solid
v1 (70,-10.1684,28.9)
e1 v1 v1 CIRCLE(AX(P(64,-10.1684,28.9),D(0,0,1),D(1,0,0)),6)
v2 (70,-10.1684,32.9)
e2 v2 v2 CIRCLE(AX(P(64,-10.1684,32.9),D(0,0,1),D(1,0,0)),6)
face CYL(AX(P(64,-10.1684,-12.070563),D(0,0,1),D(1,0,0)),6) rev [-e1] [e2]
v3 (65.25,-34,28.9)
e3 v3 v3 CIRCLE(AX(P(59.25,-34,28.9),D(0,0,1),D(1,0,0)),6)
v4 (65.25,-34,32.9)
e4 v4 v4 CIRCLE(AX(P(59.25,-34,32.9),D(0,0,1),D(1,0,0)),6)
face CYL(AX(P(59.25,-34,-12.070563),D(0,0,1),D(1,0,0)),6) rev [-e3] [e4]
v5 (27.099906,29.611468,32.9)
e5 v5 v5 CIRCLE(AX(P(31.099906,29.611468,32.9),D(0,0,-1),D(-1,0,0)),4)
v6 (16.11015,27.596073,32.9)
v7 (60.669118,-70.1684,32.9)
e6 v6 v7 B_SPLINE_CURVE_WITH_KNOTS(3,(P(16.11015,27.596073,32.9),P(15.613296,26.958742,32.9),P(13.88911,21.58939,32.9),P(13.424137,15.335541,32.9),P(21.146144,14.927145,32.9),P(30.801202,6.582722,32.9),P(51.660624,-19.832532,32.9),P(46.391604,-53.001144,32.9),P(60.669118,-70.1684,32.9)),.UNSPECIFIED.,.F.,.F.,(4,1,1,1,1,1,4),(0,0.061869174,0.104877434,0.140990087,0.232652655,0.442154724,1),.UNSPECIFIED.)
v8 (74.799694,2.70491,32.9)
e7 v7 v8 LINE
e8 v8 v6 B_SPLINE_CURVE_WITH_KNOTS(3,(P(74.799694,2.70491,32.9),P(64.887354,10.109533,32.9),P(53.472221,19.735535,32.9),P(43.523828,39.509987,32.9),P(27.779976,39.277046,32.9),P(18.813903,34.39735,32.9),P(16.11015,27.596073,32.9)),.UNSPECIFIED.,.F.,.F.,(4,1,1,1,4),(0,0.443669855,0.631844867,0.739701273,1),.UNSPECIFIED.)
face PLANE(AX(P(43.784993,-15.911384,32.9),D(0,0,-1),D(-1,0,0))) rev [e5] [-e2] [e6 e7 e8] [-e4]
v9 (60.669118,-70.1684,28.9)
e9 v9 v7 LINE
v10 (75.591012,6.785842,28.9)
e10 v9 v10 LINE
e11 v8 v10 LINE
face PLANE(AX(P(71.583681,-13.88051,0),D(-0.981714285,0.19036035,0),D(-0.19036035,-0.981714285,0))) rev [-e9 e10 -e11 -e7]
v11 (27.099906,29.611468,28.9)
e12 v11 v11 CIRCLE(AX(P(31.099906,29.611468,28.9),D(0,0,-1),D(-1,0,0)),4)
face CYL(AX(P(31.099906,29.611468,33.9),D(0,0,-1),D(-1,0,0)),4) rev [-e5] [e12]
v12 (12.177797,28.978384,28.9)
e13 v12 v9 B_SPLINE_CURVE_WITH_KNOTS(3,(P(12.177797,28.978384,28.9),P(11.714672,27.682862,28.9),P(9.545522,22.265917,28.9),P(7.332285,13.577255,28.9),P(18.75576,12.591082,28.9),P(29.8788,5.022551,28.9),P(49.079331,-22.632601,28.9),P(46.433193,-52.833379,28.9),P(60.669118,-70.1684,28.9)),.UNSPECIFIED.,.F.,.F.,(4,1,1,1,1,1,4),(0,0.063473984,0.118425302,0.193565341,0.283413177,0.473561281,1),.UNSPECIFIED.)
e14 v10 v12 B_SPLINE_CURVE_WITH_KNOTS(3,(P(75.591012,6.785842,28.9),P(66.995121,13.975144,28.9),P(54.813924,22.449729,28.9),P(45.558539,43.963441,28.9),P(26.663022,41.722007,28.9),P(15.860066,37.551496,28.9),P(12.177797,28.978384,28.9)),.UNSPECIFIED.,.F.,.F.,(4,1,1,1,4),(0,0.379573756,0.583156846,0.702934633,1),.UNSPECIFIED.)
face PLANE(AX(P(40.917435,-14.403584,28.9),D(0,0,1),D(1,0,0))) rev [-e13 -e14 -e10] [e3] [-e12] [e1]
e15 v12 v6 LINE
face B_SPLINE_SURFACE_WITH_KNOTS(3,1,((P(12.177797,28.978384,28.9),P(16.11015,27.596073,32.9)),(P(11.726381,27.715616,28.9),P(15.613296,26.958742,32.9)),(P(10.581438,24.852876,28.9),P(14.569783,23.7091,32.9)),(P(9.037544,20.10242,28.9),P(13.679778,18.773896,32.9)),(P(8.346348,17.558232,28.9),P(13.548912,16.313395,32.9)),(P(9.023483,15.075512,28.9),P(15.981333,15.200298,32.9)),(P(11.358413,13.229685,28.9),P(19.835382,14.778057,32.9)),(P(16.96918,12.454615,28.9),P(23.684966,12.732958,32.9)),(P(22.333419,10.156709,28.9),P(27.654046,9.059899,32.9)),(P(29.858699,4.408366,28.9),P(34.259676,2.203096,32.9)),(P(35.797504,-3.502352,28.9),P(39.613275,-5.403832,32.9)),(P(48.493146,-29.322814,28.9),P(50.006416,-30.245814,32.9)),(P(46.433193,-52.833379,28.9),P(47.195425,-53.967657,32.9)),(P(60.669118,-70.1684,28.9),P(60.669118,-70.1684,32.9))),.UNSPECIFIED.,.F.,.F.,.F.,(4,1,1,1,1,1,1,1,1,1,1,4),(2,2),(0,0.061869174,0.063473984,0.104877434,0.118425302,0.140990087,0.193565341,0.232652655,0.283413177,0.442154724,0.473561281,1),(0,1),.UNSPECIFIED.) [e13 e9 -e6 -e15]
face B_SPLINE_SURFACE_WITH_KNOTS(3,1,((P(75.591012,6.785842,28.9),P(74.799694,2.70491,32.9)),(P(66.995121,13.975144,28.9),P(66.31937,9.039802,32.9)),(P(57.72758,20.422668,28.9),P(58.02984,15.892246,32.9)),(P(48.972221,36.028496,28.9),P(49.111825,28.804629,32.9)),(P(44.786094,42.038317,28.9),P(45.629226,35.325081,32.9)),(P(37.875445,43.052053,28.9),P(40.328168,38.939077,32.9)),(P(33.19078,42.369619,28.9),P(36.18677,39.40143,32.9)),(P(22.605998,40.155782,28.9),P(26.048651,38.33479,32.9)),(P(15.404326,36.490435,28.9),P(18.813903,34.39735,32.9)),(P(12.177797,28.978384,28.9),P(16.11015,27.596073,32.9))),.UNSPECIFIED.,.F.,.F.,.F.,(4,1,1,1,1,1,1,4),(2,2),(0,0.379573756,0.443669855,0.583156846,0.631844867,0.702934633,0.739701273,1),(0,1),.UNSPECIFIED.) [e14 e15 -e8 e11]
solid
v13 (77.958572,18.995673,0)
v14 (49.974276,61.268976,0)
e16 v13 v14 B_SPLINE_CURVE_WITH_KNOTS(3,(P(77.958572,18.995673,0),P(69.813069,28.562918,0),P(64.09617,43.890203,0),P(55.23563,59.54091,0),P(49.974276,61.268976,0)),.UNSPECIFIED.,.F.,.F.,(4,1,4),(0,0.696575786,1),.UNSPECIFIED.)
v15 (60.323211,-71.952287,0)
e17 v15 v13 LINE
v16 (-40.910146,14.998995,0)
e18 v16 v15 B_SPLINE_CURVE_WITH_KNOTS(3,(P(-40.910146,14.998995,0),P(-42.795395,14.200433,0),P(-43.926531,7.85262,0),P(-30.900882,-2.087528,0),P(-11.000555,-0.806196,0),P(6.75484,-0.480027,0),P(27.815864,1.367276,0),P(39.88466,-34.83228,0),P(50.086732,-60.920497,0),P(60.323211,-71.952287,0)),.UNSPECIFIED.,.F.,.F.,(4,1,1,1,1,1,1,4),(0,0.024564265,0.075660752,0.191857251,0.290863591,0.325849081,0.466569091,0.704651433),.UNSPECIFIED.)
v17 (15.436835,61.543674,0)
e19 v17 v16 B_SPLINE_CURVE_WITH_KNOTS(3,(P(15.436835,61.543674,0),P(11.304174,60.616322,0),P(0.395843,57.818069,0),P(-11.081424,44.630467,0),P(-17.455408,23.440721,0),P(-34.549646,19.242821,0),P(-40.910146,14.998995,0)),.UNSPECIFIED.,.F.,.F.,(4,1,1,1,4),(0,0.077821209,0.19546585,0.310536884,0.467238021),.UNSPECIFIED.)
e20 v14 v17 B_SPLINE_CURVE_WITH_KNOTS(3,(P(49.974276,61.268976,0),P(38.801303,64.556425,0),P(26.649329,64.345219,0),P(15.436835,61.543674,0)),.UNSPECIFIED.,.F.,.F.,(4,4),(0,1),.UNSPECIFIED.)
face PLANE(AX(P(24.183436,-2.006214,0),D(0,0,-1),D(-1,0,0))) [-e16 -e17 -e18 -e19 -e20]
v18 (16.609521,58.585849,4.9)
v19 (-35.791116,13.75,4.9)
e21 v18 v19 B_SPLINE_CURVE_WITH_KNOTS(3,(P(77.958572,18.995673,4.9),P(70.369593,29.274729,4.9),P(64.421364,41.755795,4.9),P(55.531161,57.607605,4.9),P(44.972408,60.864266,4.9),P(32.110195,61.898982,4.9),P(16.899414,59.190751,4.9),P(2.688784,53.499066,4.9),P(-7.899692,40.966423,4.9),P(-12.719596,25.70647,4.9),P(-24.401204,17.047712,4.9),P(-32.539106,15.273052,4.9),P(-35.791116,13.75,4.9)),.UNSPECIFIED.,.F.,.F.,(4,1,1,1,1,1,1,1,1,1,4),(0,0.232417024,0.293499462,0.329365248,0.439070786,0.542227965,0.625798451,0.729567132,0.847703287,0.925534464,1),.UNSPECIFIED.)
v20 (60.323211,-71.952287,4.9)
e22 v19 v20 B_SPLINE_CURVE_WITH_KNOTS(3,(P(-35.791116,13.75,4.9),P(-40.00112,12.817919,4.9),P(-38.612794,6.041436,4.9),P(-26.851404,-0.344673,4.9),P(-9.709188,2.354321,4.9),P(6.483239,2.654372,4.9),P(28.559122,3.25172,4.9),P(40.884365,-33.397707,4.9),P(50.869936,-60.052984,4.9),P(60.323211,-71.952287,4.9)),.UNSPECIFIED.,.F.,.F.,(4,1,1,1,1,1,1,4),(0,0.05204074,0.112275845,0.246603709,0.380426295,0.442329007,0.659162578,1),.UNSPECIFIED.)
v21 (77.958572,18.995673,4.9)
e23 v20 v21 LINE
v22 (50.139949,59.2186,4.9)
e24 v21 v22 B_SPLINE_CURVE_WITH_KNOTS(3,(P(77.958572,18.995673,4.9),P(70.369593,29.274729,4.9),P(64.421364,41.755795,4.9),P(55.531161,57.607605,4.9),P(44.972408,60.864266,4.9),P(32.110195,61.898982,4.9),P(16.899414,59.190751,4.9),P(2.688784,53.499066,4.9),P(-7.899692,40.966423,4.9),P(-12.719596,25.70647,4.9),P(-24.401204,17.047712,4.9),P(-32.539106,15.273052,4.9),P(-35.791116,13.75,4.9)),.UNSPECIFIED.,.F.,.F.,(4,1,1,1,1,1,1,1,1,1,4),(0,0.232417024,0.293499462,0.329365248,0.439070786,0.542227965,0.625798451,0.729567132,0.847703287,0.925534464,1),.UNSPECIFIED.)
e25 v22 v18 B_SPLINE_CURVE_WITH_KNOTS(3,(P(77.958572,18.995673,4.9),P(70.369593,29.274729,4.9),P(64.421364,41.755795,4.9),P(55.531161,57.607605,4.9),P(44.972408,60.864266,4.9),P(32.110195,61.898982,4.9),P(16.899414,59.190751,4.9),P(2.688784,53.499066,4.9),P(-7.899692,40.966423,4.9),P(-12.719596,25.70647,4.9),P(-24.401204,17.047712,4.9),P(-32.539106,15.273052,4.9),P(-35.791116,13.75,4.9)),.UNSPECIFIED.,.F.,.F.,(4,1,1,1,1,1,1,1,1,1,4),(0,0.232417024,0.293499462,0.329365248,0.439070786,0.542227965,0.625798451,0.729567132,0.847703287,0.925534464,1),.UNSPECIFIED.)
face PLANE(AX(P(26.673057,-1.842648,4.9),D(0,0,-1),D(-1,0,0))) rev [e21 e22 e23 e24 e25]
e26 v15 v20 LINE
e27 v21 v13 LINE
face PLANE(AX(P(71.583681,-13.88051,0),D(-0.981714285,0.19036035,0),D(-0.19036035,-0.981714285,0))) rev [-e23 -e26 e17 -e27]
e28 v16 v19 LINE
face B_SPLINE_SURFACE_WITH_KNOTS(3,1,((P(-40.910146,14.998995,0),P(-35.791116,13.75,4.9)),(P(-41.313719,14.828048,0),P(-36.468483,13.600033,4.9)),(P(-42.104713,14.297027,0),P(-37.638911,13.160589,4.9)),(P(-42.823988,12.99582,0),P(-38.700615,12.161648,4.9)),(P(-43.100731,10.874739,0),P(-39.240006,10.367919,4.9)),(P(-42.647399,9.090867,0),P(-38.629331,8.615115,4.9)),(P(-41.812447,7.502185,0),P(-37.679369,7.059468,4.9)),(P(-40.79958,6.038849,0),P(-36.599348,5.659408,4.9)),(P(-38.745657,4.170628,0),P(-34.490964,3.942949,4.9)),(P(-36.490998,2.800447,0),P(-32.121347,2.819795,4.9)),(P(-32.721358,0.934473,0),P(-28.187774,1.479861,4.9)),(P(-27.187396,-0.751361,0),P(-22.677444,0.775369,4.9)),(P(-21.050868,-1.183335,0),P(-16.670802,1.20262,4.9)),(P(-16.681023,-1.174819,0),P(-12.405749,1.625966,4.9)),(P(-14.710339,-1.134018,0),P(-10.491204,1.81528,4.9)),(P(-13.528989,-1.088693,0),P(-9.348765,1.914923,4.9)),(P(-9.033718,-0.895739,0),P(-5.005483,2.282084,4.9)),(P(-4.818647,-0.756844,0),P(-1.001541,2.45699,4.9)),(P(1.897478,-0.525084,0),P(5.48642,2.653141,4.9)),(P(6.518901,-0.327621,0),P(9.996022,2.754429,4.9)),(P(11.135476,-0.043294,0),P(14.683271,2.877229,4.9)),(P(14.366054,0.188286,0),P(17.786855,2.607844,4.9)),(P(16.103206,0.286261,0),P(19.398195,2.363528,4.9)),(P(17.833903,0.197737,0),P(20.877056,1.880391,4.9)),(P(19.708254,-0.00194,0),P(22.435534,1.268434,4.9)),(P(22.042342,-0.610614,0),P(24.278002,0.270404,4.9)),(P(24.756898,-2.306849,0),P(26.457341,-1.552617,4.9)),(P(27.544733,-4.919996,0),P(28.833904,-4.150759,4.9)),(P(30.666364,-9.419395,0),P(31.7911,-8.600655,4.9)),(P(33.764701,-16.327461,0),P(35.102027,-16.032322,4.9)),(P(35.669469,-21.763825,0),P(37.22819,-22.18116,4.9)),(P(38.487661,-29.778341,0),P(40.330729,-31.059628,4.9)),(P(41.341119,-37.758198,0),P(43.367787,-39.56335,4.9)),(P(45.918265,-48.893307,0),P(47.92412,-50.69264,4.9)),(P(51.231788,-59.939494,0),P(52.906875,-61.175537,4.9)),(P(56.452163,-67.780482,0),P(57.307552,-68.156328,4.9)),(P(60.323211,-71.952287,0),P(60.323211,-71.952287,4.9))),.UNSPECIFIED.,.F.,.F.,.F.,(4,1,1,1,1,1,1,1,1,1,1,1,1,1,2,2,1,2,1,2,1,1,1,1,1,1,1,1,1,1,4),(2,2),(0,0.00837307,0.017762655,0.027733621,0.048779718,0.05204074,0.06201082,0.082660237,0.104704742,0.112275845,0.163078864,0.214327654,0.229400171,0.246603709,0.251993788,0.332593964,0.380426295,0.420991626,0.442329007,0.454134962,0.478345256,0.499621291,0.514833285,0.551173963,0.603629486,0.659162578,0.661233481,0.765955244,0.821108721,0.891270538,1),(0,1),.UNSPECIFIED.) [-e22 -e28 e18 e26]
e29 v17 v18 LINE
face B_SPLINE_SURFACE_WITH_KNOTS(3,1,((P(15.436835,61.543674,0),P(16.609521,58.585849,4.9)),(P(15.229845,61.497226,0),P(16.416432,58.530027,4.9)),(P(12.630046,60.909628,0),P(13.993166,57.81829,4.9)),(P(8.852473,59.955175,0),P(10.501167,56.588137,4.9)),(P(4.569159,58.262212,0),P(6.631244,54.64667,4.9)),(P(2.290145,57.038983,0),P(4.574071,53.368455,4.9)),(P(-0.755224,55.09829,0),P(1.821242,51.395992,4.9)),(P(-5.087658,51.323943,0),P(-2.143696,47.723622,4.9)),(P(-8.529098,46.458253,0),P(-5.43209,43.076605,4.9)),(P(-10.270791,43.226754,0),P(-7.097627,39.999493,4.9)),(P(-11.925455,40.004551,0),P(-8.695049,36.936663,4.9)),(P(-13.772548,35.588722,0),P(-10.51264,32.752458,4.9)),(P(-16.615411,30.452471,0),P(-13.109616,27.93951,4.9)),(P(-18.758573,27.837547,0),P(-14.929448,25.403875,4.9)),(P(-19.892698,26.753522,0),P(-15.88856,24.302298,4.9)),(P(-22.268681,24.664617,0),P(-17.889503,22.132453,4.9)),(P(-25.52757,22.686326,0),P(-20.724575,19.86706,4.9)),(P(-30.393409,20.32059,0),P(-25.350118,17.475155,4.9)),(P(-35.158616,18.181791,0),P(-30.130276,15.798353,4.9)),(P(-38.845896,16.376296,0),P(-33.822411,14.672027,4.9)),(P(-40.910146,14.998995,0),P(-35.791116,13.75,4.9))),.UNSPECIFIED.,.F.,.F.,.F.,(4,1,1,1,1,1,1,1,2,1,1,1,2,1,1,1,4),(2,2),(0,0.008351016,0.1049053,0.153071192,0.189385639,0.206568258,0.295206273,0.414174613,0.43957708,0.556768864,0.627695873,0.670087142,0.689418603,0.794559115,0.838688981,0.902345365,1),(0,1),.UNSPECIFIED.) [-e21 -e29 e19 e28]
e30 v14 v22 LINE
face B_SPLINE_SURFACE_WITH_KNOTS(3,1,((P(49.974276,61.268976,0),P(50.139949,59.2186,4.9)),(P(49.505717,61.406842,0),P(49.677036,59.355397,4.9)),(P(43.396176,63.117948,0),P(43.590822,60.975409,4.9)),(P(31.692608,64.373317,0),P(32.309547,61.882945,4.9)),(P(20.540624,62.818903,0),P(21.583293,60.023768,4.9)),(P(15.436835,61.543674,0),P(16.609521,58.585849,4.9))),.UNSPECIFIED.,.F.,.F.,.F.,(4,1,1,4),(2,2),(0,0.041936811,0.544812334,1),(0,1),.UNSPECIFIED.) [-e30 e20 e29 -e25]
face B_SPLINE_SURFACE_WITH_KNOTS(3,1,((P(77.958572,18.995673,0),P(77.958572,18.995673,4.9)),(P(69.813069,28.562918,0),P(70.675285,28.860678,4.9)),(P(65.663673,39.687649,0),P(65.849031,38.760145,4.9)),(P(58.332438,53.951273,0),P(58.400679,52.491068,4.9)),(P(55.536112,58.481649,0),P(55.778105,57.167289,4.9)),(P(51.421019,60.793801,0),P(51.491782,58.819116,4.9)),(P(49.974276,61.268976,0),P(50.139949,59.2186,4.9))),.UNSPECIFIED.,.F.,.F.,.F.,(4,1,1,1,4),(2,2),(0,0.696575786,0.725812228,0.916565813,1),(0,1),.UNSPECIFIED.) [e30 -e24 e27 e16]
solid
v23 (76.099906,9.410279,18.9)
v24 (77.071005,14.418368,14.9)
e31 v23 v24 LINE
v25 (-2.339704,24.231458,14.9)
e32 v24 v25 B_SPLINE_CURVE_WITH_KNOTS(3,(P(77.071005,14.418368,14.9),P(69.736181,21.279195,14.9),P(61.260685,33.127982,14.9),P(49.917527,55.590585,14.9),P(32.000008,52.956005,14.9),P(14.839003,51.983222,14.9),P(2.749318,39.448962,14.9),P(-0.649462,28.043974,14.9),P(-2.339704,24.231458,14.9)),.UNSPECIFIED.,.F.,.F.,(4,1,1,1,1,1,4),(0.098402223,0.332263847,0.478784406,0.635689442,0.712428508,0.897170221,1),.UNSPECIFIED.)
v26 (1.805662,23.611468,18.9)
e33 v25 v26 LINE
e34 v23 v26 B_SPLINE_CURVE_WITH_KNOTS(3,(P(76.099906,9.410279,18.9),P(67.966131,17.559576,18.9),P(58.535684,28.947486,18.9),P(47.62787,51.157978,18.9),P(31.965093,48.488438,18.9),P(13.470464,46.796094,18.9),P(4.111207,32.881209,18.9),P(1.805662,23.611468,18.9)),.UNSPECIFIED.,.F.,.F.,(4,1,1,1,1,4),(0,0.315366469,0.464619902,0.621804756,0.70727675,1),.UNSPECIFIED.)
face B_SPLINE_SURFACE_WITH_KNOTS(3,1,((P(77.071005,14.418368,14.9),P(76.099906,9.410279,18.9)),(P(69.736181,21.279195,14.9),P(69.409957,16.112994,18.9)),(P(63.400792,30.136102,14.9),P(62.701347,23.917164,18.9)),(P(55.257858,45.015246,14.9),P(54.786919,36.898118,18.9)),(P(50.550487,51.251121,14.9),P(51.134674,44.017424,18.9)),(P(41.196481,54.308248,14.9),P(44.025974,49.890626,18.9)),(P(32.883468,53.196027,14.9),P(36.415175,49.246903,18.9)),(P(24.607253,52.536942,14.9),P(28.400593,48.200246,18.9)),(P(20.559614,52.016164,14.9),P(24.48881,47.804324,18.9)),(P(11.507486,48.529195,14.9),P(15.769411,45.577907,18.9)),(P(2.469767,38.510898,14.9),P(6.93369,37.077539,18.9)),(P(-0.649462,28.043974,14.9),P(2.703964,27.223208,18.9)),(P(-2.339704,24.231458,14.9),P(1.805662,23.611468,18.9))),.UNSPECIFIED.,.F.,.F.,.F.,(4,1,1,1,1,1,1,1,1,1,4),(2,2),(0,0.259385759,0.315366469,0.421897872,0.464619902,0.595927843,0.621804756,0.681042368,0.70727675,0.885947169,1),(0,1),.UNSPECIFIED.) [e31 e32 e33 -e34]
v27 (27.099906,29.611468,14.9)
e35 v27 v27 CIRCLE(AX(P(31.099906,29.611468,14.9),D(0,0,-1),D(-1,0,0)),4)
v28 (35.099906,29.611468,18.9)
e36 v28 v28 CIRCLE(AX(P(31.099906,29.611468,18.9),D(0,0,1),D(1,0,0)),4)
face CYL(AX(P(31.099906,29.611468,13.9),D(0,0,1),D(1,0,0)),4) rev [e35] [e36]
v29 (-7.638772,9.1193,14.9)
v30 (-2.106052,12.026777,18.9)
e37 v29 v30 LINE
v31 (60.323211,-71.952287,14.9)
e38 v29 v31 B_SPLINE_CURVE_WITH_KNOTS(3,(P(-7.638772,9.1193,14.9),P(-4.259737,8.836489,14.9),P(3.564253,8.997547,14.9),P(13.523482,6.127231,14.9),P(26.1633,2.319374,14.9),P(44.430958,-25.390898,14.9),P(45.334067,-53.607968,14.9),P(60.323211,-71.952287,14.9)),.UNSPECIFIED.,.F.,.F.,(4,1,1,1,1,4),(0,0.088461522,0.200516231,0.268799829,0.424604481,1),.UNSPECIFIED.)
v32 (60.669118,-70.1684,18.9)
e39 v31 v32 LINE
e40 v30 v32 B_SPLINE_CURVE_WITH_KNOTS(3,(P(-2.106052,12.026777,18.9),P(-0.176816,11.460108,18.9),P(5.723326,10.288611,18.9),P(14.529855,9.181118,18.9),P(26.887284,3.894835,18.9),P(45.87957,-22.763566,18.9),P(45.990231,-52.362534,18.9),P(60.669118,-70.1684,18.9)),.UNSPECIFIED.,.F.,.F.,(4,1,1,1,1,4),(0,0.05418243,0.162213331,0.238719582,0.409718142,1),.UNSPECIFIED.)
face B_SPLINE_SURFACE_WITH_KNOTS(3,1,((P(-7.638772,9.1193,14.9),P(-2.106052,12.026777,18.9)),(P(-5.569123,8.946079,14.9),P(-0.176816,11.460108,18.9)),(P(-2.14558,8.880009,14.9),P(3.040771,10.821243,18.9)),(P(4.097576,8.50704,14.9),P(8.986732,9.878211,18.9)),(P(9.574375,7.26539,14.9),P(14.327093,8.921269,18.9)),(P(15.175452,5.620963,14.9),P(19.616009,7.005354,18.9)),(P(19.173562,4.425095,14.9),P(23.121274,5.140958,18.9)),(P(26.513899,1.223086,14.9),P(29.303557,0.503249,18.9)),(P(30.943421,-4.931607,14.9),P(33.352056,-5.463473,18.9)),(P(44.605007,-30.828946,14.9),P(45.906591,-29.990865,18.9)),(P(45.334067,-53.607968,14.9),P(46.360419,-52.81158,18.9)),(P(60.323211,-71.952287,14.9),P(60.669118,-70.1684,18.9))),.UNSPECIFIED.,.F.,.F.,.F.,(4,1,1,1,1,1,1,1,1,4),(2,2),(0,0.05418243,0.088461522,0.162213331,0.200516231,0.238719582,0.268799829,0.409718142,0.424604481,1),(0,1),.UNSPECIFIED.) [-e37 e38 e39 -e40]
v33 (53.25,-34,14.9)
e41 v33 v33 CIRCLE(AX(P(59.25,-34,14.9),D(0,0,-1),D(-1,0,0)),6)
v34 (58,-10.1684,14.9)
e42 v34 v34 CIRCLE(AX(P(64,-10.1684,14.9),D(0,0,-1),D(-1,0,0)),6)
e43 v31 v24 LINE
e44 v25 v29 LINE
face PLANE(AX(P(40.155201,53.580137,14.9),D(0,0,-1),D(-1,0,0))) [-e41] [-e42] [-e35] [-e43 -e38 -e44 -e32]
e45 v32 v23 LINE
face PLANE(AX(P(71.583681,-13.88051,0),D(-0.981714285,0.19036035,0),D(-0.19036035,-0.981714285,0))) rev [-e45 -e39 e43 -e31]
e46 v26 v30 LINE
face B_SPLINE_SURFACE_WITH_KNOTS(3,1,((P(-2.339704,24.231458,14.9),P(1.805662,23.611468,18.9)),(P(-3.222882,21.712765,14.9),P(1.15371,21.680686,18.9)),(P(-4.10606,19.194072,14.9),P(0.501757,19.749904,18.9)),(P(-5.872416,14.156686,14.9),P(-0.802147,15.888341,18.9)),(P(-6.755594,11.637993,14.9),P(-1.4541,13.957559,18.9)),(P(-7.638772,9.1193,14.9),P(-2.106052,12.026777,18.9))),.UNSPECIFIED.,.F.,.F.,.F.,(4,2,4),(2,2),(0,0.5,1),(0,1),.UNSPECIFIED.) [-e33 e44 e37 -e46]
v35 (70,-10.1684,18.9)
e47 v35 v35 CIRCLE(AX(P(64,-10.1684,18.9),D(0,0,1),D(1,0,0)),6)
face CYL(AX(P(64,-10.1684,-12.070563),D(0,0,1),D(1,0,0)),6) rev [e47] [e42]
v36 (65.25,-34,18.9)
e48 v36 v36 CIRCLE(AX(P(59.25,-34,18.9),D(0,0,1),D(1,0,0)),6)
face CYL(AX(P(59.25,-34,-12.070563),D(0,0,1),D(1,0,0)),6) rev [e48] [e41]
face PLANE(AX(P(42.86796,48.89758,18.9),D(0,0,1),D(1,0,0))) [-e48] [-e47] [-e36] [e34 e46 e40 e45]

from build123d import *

# Parameters (mm, degrees)
SKETCH12_R         = 4
CUT_EXTRUDE1_DEPTH = 5
SKETCH10_R         = 4
CUT_EXTRUDE2_DEPTH = 5
CUT_EXTRUDE3_START = -18
SKETCH13_R         = 6
CUT_EXTRUDE3_DEPTH = 18
CUT_EXTRUDE4_START = -18
SKETCH14_R         = 6
CUT_EXTRUDE4_DEPTH = 18


with BuildPart() as part:
    # Loft4: read off the stored shape, not the designer's step
    # Loft4: loft between two sections, ruled curve by curve
    loft4_from = [
        Edge.make_bspline([(77.958571883, 18.995672942, 0), (69.81306901, 28.562918235, 0), (65.663673482, 39.687649157, 0), (58.332437588, 53.951272654, 0), (55.536112417, 58.481649378, 0), (51.421018516, 60.793800861, 0), (49.974275634, 61.268976489, 0)], [0, 0, 0, 0, 0.696575786, 0.725812228, 0.916565813, 1, 1, 1, 1], 3),
        Edge.make_bspline([(49.974275634, 61.268976489, 0), (49.505716798, 61.406841614, 0), (43.396175688, 63.117948118, 0), (31.692607742, 64.373316716, 0), (20.540624005, 62.818902632, 0), (15.436834961, 61.543674215, 0)], [0, 0, 0, 0, 0.041936811, 0.544812334, 1, 1, 1, 1], 3),
        Edge.make_bspline([(15.436834961, 61.543674215, 0), (15.229844727, 61.49722644, 0), (12.630046118, 60.909628297, 0), (8.852473068, 59.95517464, 0), (4.569159319, 58.262211831, 0), (2.290145257, 57.038982671, 0), (-0.755223748, 55.098290452, 0), (-5.087657656, 51.323943166, 0), (-8.529098205, 46.45825302, 0), (-10.270791417, 43.226753988, 0), (-11.925454756, 40.004551376, 0), (-13.772547956, 35.588722463, 0), (-16.615410908, 30.452471026, 0), (-18.758572682, 27.837546837, 0), (-19.892697716, 26.753522216, 0), (-22.268680775, 24.664616568, 0), (-25.527570244, 22.686326073, 0), (-30.393409006, 20.320590313, 0), (-35.158615589, 18.181790597, 0), (-38.845895672, 16.376295987, 0), (-40.910146468, 14.998995279, 0)], [0, 0, 0, 0, 0.008351016, 0.1049053, 0.153071192, 0.189385639, 0.206568258, 0.295206273, 0.414174613, 0.43957708, 0.43957708, 0.556768864, 0.627695873, 0.670087142, 0.689418603, 0.689418603, 0.794559115, 0.838688981, 0.902345365, 1, 1, 1, 1], 3),
        Edge.make_bspline([(-40.910146468, 14.998995279, 0), (-41.313718624, 14.828048382, 0), (-42.104713346, 14.297027207, 0), (-42.823987538, 12.995820262, 0), (-43.100731096, 10.874739053, 0), (-42.647398924, 9.090867466, 0), (-41.812446812, 7.502185164, 0), (-40.799579849, 6.038848574, 0), (-38.745656813, 4.170628409, 0), (-36.490997878, 2.800447275, 0), (-32.721357575, 0.934472543, 0), (-27.187395601, -0.751361165, 0), (-21.050868409, -1.183335038, 0), (-16.681022909, -1.174819004, 0), (-14.710339354, -1.134018104, 0), (-13.528988879, -1.088693105, 0), (-9.033717543, -0.8957394, 0), (-4.818646922, -0.756844424, 0), (1.897478031, -0.525083956, 0), (6.518900926, -0.327620546, 0), (11.135475759, -0.043294434, 0), (14.366054176, 0.188286269, 0), (16.103205928, 0.286260616, 0), (17.833902749, 0.197736688, 0), (19.708253567, -0.001939549, 0), (22.042342351, -0.610613913, 0), (24.756897545, -2.306849034, 0), (27.544732721, -4.919996212, 0), (30.666363777, -9.419394792, 0), (33.764700654, -16.327461193, 0), (35.669469236, -21.763825494, 0), (38.48766089, -29.778340729, 0), (41.341119491, -37.75819805, 0), (45.918265172, -48.893307205, 0), (51.231788136, -59.939494455, 0), (56.452163104, -67.78048221, 0), (60.323211324, -71.952286576, 0)], [0, 0, 0, 0, 0.00837307, 0.017762655, 0.027733621, 0.048779718, 0.05204074, 0.06201082, 0.082660237, 0.104704742, 0.112275845, 0.163078864, 0.214327654, 0.229400171, 0.246603709, 0.251993788, 0.251993788, 0.332593964, 0.332593964, 0.380426295, 0.420991626, 0.420991626, 0.442329007, 0.454134962, 0.454134962, 0.478345256, 0.499621291, 0.514833285, 0.551173963, 0.603629486, 0.659162578, 0.661233481, 0.765955244, 0.821108721, 0.891270538, 1, 1, 1, 1], 3),
        Edge.make_line((77.958571883, 18.995672942, 0), (60.323211324, -71.952286576, 0)),
    ]
    loft4_to = [
        Edge.make_bspline([(77.958571883, 18.995672942, 4.9), (70.675285123, 28.860678419, 4.9), (65.849031326, 38.760145453, 4.9), (58.400678834, 52.491068252, 4.9), (55.778104722, 57.167288543, 4.9), (51.491781801, 58.81911588, 4.9), (50.139948714, 59.21860019, 4.9)], [0, 0, 0, 0, 0.696575786, 0.725812228, 0.916565813, 1, 1, 1, 1], 3),
        Edge.make_bspline([(50.139948714, 59.21860019, 4.9), (49.677036293, 59.355396849, 4.9), (43.590822432, 60.975409128, 4.9), (32.309547383, 61.882945307, 4.9), (21.583293464, 60.023768009, 4.9), (16.609520864, 58.58584891, 4.9)], [0, 0, 0, 0, 0.041936811, 0.544812334, 1, 1, 1, 1], 3),
        Edge.make_bspline([(16.609520864, 58.58584891, 4.9), (16.416431661, 58.530026766, 4.9), (13.993166246, 57.818290236, 4.9), (10.501166746, 56.588137156, 4.9), (6.63124439, 54.646669896, 4.9), (4.574071078, 53.368454521, 4.9), (1.821241951, 51.395991788, 4.9), (-2.143696469, 47.723622385, 4.9), (-5.432090011, 43.076605166, 4.9), (-7.097627007, 39.999493185, 4.9), (-8.695049459, 36.936662836, 4.9), (-10.512640041, 32.752457976, 4.9), (-13.1096156, 27.93951048, 4.9), (-14.929448281, 25.403874873, 4.9), (-15.888560217, 24.302297962, 4.9), (-17.889502616, 22.132453113, 4.9), (-20.72457484, 19.867059753, 4.9), (-25.350118352, 17.475154803, 4.9), (-30.130276288, 15.798353409, 4.9), (-33.822410743, 14.672026557, 4.9), (-35.791116406, 13.75, 4.9)], [0, 0, 0, 0, 0.008351016, 0.1049053, 0.153071192, 0.189385639, 0.206568258, 0.295206273, 0.414174613, 0.43957708, 0.43957708, 0.556768864, 0.627695873, 0.670087142, 0.689418603, 0.689418603, 0.794559115, 0.838688981, 0.902345365, 1, 1, 1, 1], 3),
        Edge.make_bspline([(-35.791116406, 13.75, 4.9), (-36.468482867, 13.600033317, 4.9), (-37.638910897, 13.160589203, 4.9), (-38.700615101, 12.161648471, 4.9), (-39.24000611, 10.367918808, 4.9), (-38.629330815, 8.615115367, 4.9), (-37.679369076, 7.059468177, 4.9), (-36.59934843, 5.659407984, 4.9), (-34.490964387, 3.942949495, 4.9), (-32.12134693, 2.819795092, 4.9), (-28.187774047, 1.479861186, 4.9), (-22.677443886, 0.775369264, 4.9), (-16.670801527, 1.202620362, 4.9), (-12.405749376, 1.625965635, 4.9), (-10.491203974, 1.815280361, 4.9), (-9.348765228, 1.914923081, 4.9), (-5.005483296, 2.282083922, 4.9), (-1.001541337, 2.456989607, 4.9), (5.48641984, 2.653141126, 4.9), (9.996022261, 2.754429051, 4.9), (14.683270709, 2.87722852, 4.9), (17.786854709, 2.607843598, 4.9), (19.398195483, 2.363528433, 4.9), (20.877055705, 1.880390579, 4.9), (22.435534005, 1.26843352, 4.9), (24.27800178, 0.270403694, 4.9), (26.457340732, -1.552617288, 4.9), (28.833903759, -4.15075873, 4.9), (31.791100171, -8.600655202, 4.9), (35.10202664, -16.032322337, 4.9), (37.228190444, -22.181159642, 4.9), (40.330728791, -31.059627703, 4.9), (43.367787061, -39.563350008, 4.9), (47.924120058, -50.692640146, 4.9), (52.906874614, -61.175537076, 4.9), (57.307552014, -68.156327996, 4.9), (60.323211324, -71.952286576, 4.9)], [0, 0, 0, 0, 0.00837307, 0.017762655, 0.027733621, 0.048779718, 0.05204074, 0.06201082, 0.082660237, 0.104704742, 0.112275845, 0.163078864, 0.214327654, 0.229400171, 0.246603709, 0.251993788, 0.251993788, 0.332593964, 0.332593964, 0.380426295, 0.420991626, 0.420991626, 0.442329007, 0.454134962, 0.454134962, 0.478345256, 0.499621291, 0.514833285, 0.551173963, 0.603629486, 0.659162578, 0.661233481, 0.765955244, 0.821108721, 0.891270538, 1, 1, 1, 1], 3),
        Edge.make_line((77.958571883, 18.995672942, 4.9), (60.323211324, -71.952286576, 4.9)),
    ]
    loft4 = Solid(Shell([*[Face.make_surface_from_curves(loft4_from[k], loft4_to[k]) for k in range(5)], Face(Wire(loft4_from)), Face(Wire(loft4_to))]))
    add(loft4)


with BuildPart() as body_2:
    # Sketch5 → Loft5 section 0
    with BuildSketch(Plane.XY.offset(14.9)):
        with BuildLine():
            Line((-2.33970387, 24.231457774), (-7.638772242, 9.119299826))
            add(Edge.make_bspline(
                [(-7.638772242, 9.119299826), (-4.259737159, 8.836488543), (3.564253031, 8.997546536), (13.523482278, 6.127231205), (26.16330004, 2.319373894), (44.43095779, -25.390898016), (45.334066891, -53.607968411), (60.323211324, -71.952286576)],
                knots=[0, 0, 0, 0, 0.088461522, 0.200516231, 0.268799829, 0.424604481, 1, 1, 1, 1], degree=3))
            Line((60.323211324, -71.952286576), (77.071004751, 14.418368197))
            add(Edge.make_bspline(
                [(-2.33970387, 24.231457774), (-0.649462445, 28.043974331), (2.749318341, 39.4489624), (14.839002739, 51.983221928), (32.000008474, 52.956004986), (49.917527377, 55.590584627), (61.260685021, 33.127982199), (69.736181012, 21.279194864), (77.071004751, 14.418368197)],
                knots=[0.098402223, 0.098402223, 0.098402223, 0.098402223, 0.201232002, 0.385973715, 0.462712781, 0.619617817, 0.766138376, 1, 1, 1, 1], degree=3))
        make_face()
    # Sketch6 → Loft5 section 1
    with BuildSketch(Plane.XY.offset(18.9)):
        with BuildLine():
            Line((1.805661875, 23.611468216), (-2.106052036, 12.026777016))
            add(Edge.make_bspline(
                [(-2.106052036, 12.026777016), (-0.176816244, 11.460107512), (5.723325627, 10.288611472), (14.529854717, 9.181118287), (26.887283715, 3.894835269), (45.87957013, -22.763566155), (45.99023137, -52.362533526), (60.669117652, -70.168400468)],
                knots=[0, 0, 0, 0, 0.05418243, 0.162213331, 0.238719582, 0.409718142, 1, 1, 1, 1], degree=3))
            Line((60.669117652, -70.168400468), (76.099905897, 9.410278968))
            add(Edge.make_bspline(
                [(1.805661875, 23.611468216), (4.11120708, 32.881209243), (13.470463933, 46.796093686), (31.965092626, 48.488438301), (47.627870259, 51.15797756), (58.535684353, 28.947486353), (67.966130648, 17.559576155), (76.099905897, 9.410278968)],
                knots=[0, 0, 0, 0, 0.29272325, 0.378195244, 0.535380098, 0.684633531, 1, 1, 1, 1], degree=3))
        make_face()
    loft()

    # Sketch10 → Cut-Extrude2 (cut)
    with BuildSketch(Plane.XY.offset(18.9)):
        with Locations((31.099905897, 29.611468216)):
            Circle(SKETCH10_R)
    extrude(amount=-CUT_EXTRUDE2_DEPTH, mode=Mode.SUBTRACT)


with BuildPart() as body_3:
    # Sketch7 → Loft6 section 0
    with BuildSketch(Plane.XY.offset(28.9)):
        with BuildLine():
            Line((75.591011754, 6.78584247), (60.669117652, -70.168400468))
            add(Edge.make_bspline(
                [(12.177797159, 28.978383554), (11.714671799, 27.682861592), (9.545521698, 22.265916858), (7.332285498, 13.577254844), (18.755760071, 12.591081512), (29.878800117, 5.022551236), (49.07933072, -22.632601206), (46.43319288, -52.833378836), (60.669117652, -70.168400468)],
                knots=[0, 0, 0, 0, 0.063473984, 0.118425302, 0.193565341, 0.283413177, 0.473561281, 1, 1, 1, 1], degree=3))
            add(Edge.make_bspline(
                [(12.177797159, 28.978383554), (15.860066232, 37.551496463), (26.66302196, 41.722007027), (45.558539362, 43.963440527), (54.813924214, 22.449728962), (66.995121102, 13.975144142), (75.591011754, 6.78584247)],
                knots=[0, 0, 0, 0, 0.297065367, 0.416843154, 0.620426244, 1, 1, 1, 1], degree=3))
        make_face()
    # Sketch8 → Loft6 section 1
    with BuildSketch(Plane.XY.offset(32.9)):
        with BuildLine():
            Line((74.799694302, 2.704910449), (60.669117652, -70.168400468))
            add(Edge.make_bspline(
                [(16.110149857, 27.596072915), (15.613295846, 26.95874249), (13.889109908, 21.589390116), (13.424136685, 15.335541349), (21.146144328, 14.927144958), (30.801201788, 6.582722179), (51.660624498, -19.832531712), (46.391604142, -53.00114424), (60.669117652, -70.168400468)],
                knots=[0, 0, 0, 0, 0.061869174, 0.104877434, 0.140990087, 0.232652655, 0.442154724, 1, 1, 1, 1], degree=3))
            add(Edge.make_bspline(
                [(16.110149857, 27.596072915), (18.813902895, 34.397349762), (27.779975561, 39.277046129), (43.52382802, 39.509986545), (53.472220526, 19.735534848), (64.887353701, 10.109533323), (74.799694302, 2.704910449)],
                knots=[0, 0, 0, 0, 0.260298727, 0.368155133, 0.556330145, 1, 1, 1, 1], degree=3))
        make_face()
    loft()

    # Sketch12 → Cut-Extrude1 (cut)
    with BuildSketch(Plane(origin=(0, 0, 28.9), x_dir=(-1, 0, 0), z_dir=(0, 0, -1))):
        with Locations((-31.099905897, 29.611468216)):
            Circle(SKETCH12_R)
    extrude(amount=-CUT_EXTRUDE1_DEPTH, mode=Mode.SUBTRACT)


with BuildPart() as cut_extrude3_tool:
    # Sketch13 → Cut-Extrude3 (new body)
    with BuildSketch(Plane.XY.offset(32.9).offset(CUT_EXTRUDE3_START)):
        with Locations((64, -10.168400468)):
            Circle(SKETCH13_R)
    extrude(amount=CUT_EXTRUDE3_DEPTH)


with BuildPart() as body_2_1:
    add(body_2.part)

    # Cut-Extrude3: cut by cut_extrude3_tool
    add(cut_extrude3_tool.part, mode=Mode.SUBTRACT)


with BuildPart() as body_3_1:
    add(body_3.part)

    # Cut-Extrude3: cut by cut_extrude3_tool
    add(cut_extrude3_tool.part, mode=Mode.SUBTRACT)


with BuildPart() as cut_extrude4_tool:
    # Sketch14 → Cut-Extrude4 (new body)
    with BuildSketch(Plane.XY.offset(32.9).offset(CUT_EXTRUDE4_START)):
        with Locations((59.25, -34)):
            Circle(SKETCH14_R)
    extrude(amount=CUT_EXTRUDE4_DEPTH)


with BuildPart() as body_2_2:
    add(body_2_1.part)

    # Cut-Extrude4: cut by cut_extrude4_tool
    add(cut_extrude4_tool.part, mode=Mode.SUBTRACT)


with BuildPart() as body_3_2:
    add(body_3_1.part)

    # Cut-Extrude4: cut by cut_extrude4_tool
    add(cut_extrude4_tool.part, mode=Mode.SUBTRACT)


solid = Compound([part.part, body_2_2.part, body_3_2.part])
